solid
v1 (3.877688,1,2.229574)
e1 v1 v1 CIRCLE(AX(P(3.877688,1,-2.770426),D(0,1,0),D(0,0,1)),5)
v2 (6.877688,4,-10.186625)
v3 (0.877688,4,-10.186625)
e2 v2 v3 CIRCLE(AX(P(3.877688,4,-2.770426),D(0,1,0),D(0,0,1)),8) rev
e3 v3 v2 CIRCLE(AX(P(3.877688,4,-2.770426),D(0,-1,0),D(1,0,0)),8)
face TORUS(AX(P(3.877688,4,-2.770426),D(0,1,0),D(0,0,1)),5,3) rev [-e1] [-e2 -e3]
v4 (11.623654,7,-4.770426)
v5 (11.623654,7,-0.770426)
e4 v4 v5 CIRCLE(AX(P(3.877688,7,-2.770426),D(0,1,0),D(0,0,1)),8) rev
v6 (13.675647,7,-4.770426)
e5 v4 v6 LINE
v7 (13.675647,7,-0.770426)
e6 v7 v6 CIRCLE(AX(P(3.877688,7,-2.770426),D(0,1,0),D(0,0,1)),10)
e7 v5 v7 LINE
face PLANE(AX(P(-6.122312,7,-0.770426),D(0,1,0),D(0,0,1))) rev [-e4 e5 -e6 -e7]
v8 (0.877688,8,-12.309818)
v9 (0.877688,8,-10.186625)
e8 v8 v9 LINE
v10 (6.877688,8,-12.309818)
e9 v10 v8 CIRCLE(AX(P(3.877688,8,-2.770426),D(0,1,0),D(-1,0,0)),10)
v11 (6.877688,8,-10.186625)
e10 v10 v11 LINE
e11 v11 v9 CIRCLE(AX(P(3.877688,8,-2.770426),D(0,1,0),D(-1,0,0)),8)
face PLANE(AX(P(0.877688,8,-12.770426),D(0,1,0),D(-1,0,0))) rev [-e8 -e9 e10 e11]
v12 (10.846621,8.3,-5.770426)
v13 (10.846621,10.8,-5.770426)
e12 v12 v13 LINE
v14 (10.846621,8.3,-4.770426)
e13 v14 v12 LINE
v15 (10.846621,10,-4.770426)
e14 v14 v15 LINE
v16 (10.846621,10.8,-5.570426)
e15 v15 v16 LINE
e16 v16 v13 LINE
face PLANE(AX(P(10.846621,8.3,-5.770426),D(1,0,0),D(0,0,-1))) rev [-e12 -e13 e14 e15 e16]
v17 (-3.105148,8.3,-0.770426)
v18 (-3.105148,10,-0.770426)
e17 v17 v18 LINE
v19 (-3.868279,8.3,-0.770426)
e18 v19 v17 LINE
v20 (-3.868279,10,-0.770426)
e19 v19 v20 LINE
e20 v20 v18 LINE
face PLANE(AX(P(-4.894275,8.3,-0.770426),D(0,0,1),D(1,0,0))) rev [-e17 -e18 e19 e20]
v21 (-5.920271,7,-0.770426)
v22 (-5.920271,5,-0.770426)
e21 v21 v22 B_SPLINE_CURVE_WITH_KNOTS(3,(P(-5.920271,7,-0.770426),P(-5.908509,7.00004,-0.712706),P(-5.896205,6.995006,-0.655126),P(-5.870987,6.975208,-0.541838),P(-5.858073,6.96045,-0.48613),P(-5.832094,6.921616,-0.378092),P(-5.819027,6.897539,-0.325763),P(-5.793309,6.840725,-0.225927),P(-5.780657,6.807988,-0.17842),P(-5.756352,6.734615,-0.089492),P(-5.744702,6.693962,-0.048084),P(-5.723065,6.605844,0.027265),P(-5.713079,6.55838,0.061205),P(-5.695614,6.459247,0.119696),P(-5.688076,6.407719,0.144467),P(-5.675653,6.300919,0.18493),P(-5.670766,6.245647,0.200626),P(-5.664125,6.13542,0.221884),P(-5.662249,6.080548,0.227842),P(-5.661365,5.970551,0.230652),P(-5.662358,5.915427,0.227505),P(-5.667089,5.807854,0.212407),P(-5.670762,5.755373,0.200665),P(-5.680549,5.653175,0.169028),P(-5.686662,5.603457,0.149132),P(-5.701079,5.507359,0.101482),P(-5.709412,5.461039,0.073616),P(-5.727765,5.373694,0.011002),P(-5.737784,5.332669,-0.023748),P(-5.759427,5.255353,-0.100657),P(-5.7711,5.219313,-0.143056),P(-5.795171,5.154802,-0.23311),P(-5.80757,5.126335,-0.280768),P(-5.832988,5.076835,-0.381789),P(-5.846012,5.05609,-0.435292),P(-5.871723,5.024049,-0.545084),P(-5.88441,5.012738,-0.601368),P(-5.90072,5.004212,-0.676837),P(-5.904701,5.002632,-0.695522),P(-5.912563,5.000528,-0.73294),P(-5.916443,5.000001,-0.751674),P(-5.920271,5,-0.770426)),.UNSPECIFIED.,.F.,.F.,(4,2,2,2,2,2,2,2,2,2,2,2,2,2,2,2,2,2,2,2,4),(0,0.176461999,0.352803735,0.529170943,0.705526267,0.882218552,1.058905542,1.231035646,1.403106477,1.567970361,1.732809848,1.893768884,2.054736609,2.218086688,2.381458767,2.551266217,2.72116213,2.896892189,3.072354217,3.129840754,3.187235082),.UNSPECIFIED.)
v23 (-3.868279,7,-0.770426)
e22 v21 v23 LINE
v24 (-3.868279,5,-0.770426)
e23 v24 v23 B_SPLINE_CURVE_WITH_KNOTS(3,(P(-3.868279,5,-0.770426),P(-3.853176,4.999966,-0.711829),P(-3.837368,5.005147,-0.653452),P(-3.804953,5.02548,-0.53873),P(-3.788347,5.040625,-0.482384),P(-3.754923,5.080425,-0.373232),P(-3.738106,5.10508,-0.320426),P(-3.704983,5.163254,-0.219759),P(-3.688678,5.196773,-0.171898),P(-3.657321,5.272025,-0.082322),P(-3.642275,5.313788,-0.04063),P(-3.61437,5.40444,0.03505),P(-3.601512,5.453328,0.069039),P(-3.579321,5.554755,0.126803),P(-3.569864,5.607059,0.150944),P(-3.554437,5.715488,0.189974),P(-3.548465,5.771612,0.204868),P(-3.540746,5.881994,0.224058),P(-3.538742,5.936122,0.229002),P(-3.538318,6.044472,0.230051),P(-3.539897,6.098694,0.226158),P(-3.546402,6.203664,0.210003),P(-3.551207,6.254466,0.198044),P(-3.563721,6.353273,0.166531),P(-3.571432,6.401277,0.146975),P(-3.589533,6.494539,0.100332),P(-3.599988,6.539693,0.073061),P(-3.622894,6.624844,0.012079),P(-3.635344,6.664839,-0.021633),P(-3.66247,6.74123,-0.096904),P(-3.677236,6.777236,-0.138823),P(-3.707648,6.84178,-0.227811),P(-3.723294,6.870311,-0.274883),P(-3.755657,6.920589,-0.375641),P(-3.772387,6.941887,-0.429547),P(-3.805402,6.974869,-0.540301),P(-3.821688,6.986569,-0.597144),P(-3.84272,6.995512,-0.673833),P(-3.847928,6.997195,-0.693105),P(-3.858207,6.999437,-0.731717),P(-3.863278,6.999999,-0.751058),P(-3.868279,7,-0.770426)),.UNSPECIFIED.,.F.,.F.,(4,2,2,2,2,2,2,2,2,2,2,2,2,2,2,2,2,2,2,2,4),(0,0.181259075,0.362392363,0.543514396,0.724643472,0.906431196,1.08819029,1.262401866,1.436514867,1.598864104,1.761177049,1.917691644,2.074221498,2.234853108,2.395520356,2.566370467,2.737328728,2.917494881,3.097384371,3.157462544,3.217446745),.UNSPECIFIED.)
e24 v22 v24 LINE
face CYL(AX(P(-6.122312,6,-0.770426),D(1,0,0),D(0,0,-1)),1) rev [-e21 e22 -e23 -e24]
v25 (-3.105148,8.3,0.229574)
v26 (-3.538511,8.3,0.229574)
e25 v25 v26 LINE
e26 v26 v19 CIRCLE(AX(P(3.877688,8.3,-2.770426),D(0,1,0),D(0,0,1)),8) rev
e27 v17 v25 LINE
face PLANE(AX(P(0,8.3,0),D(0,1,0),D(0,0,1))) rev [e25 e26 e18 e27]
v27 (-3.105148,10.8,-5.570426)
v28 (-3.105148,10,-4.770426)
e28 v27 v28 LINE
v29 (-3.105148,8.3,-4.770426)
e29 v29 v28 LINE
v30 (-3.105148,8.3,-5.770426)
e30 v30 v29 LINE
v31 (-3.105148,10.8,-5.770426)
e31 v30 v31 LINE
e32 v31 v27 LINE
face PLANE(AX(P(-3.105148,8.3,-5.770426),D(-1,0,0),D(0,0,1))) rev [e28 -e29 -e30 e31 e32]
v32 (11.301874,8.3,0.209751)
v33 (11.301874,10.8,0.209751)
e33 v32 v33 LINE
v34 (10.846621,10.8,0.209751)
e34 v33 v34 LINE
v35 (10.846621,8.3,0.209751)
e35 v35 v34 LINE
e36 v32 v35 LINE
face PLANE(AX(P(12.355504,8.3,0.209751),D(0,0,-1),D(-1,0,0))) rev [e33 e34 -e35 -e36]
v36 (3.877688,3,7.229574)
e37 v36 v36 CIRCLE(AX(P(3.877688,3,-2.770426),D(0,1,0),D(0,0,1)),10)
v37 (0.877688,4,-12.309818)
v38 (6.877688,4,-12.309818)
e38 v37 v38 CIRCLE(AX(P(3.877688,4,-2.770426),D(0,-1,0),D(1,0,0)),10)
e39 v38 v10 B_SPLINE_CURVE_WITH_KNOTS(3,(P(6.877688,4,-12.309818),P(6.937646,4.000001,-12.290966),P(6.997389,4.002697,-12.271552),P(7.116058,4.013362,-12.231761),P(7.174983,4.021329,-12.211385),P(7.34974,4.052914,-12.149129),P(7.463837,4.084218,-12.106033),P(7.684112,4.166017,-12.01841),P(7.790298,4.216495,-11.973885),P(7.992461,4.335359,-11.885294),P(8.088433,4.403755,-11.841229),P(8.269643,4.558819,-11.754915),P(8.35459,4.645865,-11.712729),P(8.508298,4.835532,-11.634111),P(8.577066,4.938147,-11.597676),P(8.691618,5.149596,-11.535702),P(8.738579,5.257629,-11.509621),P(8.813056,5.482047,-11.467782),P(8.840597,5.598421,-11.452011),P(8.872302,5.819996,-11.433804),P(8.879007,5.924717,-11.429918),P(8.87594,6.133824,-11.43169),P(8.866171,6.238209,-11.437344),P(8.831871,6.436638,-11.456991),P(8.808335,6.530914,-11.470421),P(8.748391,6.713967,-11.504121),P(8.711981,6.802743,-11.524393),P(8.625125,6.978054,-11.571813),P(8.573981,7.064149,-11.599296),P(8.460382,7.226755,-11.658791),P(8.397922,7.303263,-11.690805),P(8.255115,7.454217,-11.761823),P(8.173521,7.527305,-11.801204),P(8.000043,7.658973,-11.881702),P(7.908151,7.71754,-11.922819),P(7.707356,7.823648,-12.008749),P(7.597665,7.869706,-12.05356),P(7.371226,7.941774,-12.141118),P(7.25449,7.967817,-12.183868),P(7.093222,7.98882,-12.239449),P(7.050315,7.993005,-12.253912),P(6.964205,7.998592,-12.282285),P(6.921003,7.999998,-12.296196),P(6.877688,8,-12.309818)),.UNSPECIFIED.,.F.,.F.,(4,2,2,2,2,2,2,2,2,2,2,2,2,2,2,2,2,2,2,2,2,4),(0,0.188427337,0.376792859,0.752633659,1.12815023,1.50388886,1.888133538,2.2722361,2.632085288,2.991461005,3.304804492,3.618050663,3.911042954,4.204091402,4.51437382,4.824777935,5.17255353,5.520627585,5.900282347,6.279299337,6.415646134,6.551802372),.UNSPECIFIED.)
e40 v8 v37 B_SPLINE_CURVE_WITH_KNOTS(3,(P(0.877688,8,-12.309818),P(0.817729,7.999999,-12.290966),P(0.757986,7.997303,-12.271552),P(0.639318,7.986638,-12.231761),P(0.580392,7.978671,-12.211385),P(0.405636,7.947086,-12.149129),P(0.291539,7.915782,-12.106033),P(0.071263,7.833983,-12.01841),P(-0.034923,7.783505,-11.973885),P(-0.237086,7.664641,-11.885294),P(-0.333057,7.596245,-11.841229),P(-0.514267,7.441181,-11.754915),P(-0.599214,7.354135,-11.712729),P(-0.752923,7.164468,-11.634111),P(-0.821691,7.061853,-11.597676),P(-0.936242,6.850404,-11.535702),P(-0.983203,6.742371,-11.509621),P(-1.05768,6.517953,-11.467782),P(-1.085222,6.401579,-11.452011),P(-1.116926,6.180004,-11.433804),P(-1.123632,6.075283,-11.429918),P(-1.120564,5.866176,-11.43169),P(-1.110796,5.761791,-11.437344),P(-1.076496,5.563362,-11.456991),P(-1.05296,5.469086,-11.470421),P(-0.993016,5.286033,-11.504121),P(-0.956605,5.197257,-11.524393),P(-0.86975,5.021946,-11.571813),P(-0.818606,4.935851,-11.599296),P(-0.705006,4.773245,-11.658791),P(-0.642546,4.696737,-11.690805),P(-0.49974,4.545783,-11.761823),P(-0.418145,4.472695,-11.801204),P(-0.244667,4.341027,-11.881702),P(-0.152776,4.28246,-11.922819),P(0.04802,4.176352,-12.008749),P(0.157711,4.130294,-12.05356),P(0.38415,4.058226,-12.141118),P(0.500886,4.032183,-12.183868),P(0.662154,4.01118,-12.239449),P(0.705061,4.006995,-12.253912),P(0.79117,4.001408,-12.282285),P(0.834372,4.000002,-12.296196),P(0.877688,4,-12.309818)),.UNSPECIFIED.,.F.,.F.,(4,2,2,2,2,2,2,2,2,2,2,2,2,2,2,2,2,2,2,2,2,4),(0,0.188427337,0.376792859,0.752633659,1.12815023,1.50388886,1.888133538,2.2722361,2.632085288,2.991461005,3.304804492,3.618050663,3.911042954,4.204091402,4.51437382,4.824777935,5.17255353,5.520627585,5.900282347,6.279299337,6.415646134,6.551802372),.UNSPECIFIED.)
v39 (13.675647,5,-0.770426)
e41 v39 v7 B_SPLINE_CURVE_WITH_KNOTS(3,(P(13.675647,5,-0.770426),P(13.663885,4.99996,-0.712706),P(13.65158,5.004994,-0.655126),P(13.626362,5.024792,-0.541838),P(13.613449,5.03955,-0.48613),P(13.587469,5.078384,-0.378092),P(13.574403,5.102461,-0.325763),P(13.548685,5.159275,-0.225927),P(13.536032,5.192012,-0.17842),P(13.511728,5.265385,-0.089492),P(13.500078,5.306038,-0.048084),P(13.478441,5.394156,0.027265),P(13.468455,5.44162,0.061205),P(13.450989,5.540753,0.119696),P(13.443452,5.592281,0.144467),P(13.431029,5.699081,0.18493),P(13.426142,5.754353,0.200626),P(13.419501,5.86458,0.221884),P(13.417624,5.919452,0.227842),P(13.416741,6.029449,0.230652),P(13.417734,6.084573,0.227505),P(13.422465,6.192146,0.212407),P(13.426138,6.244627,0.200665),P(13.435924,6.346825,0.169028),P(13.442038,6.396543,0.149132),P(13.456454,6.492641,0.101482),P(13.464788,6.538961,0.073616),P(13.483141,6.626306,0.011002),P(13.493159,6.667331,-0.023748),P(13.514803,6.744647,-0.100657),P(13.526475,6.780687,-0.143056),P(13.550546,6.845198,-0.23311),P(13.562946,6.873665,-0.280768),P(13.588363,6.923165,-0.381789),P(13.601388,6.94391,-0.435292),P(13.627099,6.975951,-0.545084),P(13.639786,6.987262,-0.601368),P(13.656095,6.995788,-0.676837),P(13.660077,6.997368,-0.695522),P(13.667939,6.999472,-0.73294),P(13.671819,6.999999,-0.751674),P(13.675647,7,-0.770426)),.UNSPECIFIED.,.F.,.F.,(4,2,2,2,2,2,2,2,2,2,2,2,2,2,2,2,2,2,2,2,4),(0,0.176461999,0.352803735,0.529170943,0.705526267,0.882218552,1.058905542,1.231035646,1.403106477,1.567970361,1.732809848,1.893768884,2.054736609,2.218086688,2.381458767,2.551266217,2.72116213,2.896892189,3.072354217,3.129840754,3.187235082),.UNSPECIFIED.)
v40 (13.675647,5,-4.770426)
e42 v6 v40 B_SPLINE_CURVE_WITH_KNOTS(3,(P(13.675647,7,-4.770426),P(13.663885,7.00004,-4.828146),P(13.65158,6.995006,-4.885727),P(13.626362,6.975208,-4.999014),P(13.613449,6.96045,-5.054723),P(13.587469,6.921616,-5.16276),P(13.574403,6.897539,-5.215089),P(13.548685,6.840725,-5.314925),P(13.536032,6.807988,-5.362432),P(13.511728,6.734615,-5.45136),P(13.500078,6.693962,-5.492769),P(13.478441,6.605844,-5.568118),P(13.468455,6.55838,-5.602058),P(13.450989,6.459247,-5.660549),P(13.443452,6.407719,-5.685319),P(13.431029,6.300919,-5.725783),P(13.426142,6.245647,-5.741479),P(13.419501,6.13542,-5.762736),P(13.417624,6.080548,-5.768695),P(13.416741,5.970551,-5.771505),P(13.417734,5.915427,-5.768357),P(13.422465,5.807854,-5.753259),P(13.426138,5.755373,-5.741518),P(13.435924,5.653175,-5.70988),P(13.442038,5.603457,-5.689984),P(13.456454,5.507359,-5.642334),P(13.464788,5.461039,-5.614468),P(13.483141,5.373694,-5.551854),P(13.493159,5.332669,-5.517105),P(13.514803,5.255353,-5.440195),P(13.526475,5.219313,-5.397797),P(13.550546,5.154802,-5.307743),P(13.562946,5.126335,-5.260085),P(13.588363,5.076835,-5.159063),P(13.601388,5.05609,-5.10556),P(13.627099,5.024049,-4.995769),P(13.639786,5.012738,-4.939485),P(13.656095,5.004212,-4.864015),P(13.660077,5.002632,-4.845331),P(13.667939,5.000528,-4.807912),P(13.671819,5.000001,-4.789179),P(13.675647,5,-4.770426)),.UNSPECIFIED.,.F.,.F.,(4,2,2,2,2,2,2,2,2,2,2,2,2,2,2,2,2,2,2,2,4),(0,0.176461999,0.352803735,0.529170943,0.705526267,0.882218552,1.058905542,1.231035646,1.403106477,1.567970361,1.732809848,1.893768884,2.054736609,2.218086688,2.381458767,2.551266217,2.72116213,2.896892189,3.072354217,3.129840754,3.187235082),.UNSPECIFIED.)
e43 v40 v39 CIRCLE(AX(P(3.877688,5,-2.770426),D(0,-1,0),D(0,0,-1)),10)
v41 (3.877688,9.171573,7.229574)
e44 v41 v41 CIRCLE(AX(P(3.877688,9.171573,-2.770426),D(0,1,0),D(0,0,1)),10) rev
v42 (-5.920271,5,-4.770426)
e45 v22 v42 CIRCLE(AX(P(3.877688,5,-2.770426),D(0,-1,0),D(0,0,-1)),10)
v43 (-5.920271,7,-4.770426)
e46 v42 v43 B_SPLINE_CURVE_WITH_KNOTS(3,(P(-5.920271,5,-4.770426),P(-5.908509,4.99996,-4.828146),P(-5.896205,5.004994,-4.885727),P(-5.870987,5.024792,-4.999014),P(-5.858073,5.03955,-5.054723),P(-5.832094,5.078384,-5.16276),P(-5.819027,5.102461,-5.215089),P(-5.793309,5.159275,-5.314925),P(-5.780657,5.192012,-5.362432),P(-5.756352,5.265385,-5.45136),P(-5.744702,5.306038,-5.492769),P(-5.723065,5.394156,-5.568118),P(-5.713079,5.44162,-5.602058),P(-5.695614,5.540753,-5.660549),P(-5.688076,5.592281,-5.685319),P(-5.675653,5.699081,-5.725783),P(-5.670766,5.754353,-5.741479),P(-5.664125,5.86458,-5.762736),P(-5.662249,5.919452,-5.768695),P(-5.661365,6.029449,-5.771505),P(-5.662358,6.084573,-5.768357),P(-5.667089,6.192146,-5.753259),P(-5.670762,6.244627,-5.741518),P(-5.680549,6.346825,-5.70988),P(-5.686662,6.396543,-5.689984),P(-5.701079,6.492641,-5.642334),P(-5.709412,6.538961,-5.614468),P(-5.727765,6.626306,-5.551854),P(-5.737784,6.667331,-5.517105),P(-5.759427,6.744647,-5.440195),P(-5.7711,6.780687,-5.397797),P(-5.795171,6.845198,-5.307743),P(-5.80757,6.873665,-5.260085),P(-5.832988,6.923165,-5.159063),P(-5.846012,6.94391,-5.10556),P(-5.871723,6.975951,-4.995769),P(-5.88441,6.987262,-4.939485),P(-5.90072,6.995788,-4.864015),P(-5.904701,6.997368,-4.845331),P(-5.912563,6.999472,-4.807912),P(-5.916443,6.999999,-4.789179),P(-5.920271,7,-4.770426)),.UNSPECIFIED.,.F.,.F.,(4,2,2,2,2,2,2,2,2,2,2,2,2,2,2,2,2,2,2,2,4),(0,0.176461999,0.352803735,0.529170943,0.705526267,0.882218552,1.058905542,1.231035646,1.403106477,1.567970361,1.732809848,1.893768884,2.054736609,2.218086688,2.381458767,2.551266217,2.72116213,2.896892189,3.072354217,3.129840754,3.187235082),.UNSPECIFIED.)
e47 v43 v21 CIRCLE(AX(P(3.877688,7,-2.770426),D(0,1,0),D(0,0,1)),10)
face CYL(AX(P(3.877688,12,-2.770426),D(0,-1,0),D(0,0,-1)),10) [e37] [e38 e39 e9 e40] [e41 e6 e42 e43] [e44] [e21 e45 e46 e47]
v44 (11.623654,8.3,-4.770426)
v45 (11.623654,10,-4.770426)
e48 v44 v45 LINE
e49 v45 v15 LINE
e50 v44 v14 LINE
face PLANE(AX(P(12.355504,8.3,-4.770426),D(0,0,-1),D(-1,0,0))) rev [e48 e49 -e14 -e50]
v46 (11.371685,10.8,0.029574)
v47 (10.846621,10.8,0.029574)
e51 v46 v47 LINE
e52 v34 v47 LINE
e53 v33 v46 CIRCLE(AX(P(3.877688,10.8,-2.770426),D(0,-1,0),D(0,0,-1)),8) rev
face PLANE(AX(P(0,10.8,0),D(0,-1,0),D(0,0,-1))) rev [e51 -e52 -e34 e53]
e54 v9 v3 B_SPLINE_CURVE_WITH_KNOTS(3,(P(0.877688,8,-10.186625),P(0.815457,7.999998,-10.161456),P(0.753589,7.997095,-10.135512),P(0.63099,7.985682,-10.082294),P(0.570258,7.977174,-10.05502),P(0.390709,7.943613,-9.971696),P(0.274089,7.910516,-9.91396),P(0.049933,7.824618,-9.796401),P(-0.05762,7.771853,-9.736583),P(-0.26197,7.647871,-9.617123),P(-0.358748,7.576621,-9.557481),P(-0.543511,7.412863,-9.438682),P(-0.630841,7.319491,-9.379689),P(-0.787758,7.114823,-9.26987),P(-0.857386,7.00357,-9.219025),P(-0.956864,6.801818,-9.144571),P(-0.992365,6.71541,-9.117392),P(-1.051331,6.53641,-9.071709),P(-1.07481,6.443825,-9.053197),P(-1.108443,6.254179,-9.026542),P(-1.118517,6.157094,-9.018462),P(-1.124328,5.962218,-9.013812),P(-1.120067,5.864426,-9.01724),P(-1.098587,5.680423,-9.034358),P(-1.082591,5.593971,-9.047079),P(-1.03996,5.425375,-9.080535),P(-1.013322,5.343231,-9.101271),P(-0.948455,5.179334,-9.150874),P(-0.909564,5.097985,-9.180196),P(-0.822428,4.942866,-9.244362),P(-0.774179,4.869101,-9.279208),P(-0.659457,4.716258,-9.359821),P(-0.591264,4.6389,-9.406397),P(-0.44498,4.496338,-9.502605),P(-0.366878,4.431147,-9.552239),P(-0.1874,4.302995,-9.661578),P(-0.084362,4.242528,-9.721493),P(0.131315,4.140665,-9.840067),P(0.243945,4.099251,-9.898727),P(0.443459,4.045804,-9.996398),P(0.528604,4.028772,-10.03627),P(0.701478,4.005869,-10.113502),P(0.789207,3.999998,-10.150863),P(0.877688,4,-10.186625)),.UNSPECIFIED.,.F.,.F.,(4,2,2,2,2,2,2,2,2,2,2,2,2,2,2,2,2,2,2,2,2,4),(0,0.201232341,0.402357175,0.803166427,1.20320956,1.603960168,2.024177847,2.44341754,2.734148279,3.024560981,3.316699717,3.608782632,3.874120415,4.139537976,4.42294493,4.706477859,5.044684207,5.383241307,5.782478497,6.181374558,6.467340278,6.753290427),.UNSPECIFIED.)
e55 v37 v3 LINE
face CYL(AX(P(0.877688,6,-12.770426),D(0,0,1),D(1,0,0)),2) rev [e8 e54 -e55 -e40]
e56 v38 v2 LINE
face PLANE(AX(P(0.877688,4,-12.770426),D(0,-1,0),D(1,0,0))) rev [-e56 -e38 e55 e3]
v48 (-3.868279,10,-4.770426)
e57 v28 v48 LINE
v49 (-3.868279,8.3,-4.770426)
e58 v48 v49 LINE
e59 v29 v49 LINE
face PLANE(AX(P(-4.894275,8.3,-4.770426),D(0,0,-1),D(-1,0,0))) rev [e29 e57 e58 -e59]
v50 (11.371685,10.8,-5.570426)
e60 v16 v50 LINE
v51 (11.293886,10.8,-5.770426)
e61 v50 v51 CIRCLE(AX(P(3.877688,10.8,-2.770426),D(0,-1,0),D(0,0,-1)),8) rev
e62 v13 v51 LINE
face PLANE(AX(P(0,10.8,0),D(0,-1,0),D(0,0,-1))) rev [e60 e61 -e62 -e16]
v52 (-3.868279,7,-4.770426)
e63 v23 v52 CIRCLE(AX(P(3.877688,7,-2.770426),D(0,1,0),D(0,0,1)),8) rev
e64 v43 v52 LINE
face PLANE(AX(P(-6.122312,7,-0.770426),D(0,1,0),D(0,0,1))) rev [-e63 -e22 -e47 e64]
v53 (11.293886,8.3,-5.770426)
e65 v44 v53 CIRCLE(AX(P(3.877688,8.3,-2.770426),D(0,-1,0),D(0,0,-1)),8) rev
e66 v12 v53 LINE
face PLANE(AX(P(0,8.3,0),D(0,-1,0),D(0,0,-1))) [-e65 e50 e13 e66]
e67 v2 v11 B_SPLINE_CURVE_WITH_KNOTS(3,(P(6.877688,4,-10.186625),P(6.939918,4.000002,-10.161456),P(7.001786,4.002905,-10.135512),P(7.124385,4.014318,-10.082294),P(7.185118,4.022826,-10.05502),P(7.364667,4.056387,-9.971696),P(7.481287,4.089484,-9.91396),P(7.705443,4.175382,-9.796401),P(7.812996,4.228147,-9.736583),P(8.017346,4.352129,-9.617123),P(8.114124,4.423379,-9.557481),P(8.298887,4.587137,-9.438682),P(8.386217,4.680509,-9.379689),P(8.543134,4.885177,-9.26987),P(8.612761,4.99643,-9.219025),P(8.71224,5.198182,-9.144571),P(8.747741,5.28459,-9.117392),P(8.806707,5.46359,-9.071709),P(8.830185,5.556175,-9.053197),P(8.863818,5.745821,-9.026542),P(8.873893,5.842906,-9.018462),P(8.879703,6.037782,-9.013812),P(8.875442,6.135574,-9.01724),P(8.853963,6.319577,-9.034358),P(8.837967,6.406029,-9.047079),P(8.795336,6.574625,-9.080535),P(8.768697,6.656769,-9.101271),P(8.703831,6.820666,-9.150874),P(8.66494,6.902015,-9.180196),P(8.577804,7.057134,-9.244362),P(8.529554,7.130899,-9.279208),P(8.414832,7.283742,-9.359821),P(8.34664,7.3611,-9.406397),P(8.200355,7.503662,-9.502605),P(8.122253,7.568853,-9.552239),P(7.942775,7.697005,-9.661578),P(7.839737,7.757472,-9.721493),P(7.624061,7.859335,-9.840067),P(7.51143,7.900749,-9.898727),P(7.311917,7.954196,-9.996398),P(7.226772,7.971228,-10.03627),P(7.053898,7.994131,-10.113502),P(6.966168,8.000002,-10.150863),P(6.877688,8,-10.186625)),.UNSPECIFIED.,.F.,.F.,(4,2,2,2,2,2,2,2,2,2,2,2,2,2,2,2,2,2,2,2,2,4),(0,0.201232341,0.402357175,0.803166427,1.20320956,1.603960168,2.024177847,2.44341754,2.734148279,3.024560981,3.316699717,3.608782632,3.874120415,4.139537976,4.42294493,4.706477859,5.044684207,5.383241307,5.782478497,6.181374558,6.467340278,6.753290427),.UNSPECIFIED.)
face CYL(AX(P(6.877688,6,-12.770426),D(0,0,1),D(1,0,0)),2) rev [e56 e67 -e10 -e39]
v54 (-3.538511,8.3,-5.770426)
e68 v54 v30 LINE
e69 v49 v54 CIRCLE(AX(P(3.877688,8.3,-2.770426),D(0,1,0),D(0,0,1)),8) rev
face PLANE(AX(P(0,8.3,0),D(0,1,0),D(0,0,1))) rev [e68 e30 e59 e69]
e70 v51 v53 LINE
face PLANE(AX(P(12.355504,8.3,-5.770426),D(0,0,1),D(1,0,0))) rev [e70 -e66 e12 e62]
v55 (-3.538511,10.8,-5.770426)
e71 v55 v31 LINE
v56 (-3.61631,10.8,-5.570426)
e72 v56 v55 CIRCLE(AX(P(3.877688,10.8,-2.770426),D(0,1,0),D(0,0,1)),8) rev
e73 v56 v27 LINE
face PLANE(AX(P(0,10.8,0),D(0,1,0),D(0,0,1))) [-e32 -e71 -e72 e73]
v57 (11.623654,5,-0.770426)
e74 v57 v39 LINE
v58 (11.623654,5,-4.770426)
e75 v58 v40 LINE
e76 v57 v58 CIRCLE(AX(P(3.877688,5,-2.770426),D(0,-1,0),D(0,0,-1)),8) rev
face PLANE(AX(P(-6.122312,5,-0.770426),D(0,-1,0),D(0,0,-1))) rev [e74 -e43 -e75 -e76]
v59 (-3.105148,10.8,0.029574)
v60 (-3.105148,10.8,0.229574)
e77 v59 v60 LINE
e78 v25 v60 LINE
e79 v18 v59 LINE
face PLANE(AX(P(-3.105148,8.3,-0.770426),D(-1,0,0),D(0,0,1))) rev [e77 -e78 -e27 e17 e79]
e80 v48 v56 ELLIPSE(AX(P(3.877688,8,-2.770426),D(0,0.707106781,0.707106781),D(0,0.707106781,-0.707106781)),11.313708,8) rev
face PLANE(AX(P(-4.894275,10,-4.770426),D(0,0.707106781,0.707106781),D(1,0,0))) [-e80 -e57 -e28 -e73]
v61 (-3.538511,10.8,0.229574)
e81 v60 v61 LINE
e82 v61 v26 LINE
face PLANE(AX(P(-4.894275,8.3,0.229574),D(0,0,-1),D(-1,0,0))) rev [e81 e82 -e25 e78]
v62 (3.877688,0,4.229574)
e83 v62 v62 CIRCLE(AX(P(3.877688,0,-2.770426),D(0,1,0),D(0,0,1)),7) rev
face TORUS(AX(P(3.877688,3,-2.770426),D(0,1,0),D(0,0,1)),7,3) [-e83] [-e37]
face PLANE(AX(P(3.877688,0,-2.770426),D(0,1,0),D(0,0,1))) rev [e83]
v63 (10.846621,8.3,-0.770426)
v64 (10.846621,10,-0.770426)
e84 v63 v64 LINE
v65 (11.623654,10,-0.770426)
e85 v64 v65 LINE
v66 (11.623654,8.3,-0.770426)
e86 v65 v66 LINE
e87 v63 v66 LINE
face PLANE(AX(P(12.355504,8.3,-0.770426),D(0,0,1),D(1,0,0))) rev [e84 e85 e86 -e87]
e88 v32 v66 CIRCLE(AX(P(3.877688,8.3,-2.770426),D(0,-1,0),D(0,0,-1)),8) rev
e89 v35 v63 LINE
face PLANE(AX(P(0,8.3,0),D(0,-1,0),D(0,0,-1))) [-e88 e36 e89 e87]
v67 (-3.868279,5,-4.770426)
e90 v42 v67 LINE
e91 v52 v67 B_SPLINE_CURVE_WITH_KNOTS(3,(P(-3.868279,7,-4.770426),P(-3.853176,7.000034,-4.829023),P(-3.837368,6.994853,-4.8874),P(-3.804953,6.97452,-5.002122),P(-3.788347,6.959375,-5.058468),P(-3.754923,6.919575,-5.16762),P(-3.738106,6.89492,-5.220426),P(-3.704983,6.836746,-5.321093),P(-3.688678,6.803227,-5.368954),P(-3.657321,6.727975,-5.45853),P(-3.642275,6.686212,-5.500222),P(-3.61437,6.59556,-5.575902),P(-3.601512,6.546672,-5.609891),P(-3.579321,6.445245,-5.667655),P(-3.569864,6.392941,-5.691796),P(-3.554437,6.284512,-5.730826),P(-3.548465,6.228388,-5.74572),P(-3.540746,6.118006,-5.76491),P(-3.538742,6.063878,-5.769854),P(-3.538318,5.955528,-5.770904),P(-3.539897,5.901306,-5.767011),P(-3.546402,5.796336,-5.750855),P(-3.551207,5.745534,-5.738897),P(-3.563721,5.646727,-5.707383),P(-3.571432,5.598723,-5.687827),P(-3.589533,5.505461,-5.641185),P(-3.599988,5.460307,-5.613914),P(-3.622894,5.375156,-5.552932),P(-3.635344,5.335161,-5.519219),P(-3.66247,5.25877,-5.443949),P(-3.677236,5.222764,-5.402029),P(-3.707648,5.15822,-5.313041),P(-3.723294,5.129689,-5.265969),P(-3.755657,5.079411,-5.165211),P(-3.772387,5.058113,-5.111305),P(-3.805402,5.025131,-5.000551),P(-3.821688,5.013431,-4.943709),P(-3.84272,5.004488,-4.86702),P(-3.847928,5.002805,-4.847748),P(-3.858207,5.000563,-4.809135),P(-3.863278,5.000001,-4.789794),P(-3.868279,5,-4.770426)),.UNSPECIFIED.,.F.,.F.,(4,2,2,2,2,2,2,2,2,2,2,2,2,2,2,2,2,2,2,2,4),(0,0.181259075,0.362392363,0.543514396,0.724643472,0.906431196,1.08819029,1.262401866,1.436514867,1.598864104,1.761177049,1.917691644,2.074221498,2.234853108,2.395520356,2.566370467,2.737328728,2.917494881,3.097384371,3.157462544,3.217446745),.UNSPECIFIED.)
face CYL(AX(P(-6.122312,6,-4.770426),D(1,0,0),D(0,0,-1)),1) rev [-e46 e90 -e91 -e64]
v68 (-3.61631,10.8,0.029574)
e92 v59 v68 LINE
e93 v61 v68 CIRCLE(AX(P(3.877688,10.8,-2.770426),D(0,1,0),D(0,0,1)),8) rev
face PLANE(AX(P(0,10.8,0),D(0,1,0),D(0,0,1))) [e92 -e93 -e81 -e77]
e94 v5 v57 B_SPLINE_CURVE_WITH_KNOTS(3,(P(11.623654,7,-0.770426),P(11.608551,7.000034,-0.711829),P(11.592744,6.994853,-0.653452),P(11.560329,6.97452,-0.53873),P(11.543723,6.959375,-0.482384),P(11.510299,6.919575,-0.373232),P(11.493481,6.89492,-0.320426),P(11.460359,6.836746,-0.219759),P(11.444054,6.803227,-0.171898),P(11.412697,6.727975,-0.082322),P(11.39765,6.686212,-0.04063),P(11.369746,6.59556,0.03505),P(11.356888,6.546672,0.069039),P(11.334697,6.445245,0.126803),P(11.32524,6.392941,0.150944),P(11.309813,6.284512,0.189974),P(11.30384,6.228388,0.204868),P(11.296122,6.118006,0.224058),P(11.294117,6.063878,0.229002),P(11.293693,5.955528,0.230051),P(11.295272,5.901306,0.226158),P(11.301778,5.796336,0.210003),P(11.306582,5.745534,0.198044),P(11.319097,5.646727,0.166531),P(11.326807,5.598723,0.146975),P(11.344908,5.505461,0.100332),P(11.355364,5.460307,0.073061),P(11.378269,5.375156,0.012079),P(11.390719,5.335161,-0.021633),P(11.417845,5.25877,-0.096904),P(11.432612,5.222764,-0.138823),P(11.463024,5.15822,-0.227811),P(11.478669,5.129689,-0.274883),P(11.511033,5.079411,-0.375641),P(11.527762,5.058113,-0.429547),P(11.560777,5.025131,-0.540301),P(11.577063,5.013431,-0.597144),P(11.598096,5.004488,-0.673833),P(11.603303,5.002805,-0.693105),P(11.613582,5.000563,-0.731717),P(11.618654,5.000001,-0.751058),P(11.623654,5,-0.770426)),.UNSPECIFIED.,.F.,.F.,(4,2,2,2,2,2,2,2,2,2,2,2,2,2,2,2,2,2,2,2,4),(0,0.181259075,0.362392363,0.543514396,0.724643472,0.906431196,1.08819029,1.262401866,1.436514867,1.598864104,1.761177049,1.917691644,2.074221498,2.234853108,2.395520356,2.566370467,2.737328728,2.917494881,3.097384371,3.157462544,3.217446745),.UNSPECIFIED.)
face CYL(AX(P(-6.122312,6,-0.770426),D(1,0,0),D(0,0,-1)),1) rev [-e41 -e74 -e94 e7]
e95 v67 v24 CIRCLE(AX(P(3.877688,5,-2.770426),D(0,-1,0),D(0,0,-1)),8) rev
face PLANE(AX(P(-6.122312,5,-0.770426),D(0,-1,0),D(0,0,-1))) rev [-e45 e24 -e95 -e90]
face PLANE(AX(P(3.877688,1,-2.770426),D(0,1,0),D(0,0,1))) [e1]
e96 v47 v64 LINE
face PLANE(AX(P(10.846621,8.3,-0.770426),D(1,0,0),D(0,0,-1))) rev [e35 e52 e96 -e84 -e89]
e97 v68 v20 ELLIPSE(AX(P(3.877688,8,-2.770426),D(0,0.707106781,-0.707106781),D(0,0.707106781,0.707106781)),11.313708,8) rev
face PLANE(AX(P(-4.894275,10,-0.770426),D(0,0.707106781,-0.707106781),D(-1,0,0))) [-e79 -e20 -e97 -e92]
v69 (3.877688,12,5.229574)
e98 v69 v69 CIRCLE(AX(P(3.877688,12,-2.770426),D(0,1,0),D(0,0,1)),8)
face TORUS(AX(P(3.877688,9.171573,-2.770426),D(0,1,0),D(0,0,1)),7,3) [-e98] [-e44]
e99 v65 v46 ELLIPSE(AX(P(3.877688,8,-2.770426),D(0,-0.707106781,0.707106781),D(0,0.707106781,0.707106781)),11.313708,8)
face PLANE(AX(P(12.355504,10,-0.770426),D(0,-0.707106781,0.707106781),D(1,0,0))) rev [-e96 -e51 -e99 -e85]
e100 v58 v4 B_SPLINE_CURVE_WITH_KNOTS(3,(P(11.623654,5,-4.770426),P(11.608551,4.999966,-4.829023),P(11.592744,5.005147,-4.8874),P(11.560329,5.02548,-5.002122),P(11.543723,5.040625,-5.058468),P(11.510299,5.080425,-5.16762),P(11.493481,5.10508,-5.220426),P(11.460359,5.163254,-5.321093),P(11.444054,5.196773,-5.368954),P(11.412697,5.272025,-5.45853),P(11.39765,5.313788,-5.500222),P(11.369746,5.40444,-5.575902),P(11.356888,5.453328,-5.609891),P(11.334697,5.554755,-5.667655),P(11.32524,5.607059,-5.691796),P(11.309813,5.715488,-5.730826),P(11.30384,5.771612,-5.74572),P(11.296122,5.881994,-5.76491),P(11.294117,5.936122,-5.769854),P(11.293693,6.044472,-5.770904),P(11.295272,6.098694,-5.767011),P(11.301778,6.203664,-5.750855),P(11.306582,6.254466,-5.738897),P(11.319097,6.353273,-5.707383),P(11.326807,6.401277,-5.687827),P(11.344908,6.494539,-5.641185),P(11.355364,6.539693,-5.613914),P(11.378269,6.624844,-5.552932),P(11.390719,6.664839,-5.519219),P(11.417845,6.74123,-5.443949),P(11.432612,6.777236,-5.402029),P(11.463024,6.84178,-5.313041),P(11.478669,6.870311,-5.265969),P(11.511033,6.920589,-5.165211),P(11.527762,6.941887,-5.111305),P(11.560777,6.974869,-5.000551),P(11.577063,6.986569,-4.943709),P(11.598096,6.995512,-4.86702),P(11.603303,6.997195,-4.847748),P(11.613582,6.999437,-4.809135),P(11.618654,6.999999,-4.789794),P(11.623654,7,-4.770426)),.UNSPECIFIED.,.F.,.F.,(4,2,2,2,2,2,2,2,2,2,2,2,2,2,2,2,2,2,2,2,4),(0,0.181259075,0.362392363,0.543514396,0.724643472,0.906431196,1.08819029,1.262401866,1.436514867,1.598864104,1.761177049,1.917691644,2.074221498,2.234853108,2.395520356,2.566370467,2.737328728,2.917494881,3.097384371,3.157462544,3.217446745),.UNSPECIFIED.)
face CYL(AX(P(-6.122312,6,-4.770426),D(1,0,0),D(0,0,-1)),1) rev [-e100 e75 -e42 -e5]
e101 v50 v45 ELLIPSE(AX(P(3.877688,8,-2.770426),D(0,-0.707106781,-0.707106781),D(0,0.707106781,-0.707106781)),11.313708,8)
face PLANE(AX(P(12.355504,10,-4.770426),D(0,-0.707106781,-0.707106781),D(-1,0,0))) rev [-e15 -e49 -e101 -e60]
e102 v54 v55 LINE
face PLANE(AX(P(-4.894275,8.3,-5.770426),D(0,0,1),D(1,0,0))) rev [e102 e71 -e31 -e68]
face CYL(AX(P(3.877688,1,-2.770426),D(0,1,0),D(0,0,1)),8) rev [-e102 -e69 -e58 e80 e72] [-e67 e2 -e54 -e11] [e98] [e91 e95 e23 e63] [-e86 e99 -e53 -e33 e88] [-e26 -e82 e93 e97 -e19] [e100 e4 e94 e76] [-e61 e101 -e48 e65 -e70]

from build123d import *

# Parameters (mm, degrees)
SKETCH_1_R               = 10
EXTRUDE_1_DEPTH          = 12
CUT_EXTRUDE_1_DEPTH      = 23.353389068
SKETCH_3_R               = 8
CUT_EXTRUDE_2_DEPTH      = 11
FILLET_1_R               = 3
CUT_EXTRUDE_3_DEPTH      = 23.353389241
CUT_EXTRUDE_3_DEPTH_BACK = 23.353389241
SKETCH_5_W               = 1.508883289
SKETCH_5_H               = 1
SKETCH_5_H_2             = 0.980176719
SKETCH_5_W_2             = 1.789126732
EXTRUDE_3_DEPTH          = 2.5
CHAMFER_2_SIZE           = 0.8


with BuildPart() as part:
    # 草图1 → 凸台-拉伸1 (new body)
    with BuildSketch(Plane(origin=(0, 0, 0), x_dir=(1, 0, 0), z_dir=(0, 1, 0))):
        with Locations(Location((3.877687805, 2.770426149, 0), (0, 0, 270))):
            Circle(SKETCH_1_R)
    extrude(amount=EXTRUDE_1_DEPTH)

    # 草图2 → 切除-拉伸1 (cut, through all)
    with BuildSketch(Plane.XY):
        with BuildLine():
            Line((0.877687805, 8), (6.877687805, 8))
            ThreePointArc((6.877687805, 8), (8.877687805, 6), (6.877687805, 4))
            Line((6.877687805, 4), (0.877687805, 4))
            ThreePointArc((0.877687805, 4), (-1.122312195, 6), (0.877687805, 8))
        make_face()
    extrude(amount=-CUT_EXTRUDE_1_DEPTH, mode=Mode.SUBTRACT)

    # 草图3 → 切除-拉伸2 (cut)
    with BuildSketch(Plane(origin=(0, 12, 0), x_dir=(1, 0, 0), z_dir=(0, 1, 0))):
        with Locations(Location((3.877687805, 2.770426149, 0), (0, 0, 270))):
            Circle(SKETCH_3_R)
    extrude(amount=-CUT_EXTRUDE_2_DEPTH, mode=Mode.SUBTRACT)

    # 圆角1
    # the kernel refuses this fillet: 3 mm, written as the material it adds along each edge
    with BuildSketch(Plane(origin=(3.877687805, 1, -2.770426149), x_dir=(0, 0, 1), z_dir=(-1, 0, 0))) as fillet_1_piece_1:
        with BuildLine():
            CenterArc((8 - FILLET_1_R, FILLET_1_R), FILLET_1_R, 270, 90)
            Line((8 - FILLET_1_R, 0), (8, 0))
            Line((8, 0), (8, FILLET_1_R))
        make_face()
    revolve(axis=Axis((3.877687805, 1, -2.770426149), (0, 1, 0)))
    # the kernel refuses this fillet: 3 mm, written as the material it takes off along each edge
    with BuildSketch(Plane(origin=(3.877687805, 0, -2.770426149), x_dir=(0, 0, 1), z_dir=(-1, 0, 0))) as fillet_1_2_piece_1:
        with BuildLine():
            CenterArc((10 - FILLET_1_R, FILLET_1_R), FILLET_1_R, 270, 90)
            Line((10 - FILLET_1_R, 0), (10, 0))
            Line((10, 0), (10, FILLET_1_R))
        make_face()
    revolve(axis=Axis((3.877687805, 0, -2.770426149), (0, 1, 0)), mode=Mode.SUBTRACT)
    with BuildSketch(Plane(origin=(3.877687805, 12, -2.770426149), x_dir=(0, 0, 1), z_dir=(-1, 0, 0))) as fillet_1_2_piece_2:
        with BuildLine():
            CenterArc((7, -2.828427125), FILLET_1_R, 0, 70.528779366)
            Line((8, 0), (10, 0))
            Line((10, 0), (10, -2.828427125))
        make_face()
    revolve(axis=Axis((3.877687805, 12, -2.770426149), (0, 1, 0)), mode=Mode.SUBTRACT)

    # 草图4 → 切除-拉伸3 (cut, two sides: drawn at the far end of the back side and taken through both)
    with BuildSketch(Plane(origin=(0, 0, 0), x_dir=(0, 0, -1), z_dir=(1, 0, 0)).offset(-CUT_EXTRUDE_3_DEPTH_BACK)):
        with BuildLine():
            Line((0.770426149, 7), (4.770426149, 7))
            ThreePointArc((4.770426149, 7), (5.770426149, 6), (4.770426149, 5))
            Line((4.770426149, 5), (0.770426149, 5))
            ThreePointArc((0.770426149, 5), (-0.229573851, 6), (0.770426149, 7))
        make_face()
    extrude(amount=CUT_EXTRUDE_3_DEPTH + CUT_EXTRUDE_3_DEPTH_BACK, mode=Mode.SUBTRACT)

    # 草图5 → 凸台-拉伸3 (add)
    with BuildSketch(Plane(origin=(0, 10.8, 0), x_dir=(-1, 0, 0), z_dir=(0, -1, 0))):
        with Locations((-11.601062589, 5.270426149)):
            Rectangle(SKETCH_5_W, SKETCH_5_H)
        with Locations((-11.601062589, 0.280337789)):
            Rectangle(SKETCH_5_W, SKETCH_5_H_2)
        with Locations((3.999711661, 5.270426149)):
            Rectangle(SKETCH_5_W_2, SKETCH_5_H)
        with Locations((3.999711661, 0.270426149)):
            Rectangle(SKETCH_5_W_2, SKETCH_5_H)
    extrude(amount=EXTRUDE_3_DEPTH)

    # 倒角2
    chamfer_2_edges = [part.edges().sort_by_distance(p)[0] for p in [
        (11.235137721, 10.8, -0.770426149),
        (-3.486713591, 10.8, -4.770426149),
        (-3.486713591, 10.8, -0.770426149),
        (11.235137721, 10.8, -4.770426149),
    ]]
    chamfer(chamfer_2_edges, length=CHAMFER_2_SIZE)


solid = part.part
